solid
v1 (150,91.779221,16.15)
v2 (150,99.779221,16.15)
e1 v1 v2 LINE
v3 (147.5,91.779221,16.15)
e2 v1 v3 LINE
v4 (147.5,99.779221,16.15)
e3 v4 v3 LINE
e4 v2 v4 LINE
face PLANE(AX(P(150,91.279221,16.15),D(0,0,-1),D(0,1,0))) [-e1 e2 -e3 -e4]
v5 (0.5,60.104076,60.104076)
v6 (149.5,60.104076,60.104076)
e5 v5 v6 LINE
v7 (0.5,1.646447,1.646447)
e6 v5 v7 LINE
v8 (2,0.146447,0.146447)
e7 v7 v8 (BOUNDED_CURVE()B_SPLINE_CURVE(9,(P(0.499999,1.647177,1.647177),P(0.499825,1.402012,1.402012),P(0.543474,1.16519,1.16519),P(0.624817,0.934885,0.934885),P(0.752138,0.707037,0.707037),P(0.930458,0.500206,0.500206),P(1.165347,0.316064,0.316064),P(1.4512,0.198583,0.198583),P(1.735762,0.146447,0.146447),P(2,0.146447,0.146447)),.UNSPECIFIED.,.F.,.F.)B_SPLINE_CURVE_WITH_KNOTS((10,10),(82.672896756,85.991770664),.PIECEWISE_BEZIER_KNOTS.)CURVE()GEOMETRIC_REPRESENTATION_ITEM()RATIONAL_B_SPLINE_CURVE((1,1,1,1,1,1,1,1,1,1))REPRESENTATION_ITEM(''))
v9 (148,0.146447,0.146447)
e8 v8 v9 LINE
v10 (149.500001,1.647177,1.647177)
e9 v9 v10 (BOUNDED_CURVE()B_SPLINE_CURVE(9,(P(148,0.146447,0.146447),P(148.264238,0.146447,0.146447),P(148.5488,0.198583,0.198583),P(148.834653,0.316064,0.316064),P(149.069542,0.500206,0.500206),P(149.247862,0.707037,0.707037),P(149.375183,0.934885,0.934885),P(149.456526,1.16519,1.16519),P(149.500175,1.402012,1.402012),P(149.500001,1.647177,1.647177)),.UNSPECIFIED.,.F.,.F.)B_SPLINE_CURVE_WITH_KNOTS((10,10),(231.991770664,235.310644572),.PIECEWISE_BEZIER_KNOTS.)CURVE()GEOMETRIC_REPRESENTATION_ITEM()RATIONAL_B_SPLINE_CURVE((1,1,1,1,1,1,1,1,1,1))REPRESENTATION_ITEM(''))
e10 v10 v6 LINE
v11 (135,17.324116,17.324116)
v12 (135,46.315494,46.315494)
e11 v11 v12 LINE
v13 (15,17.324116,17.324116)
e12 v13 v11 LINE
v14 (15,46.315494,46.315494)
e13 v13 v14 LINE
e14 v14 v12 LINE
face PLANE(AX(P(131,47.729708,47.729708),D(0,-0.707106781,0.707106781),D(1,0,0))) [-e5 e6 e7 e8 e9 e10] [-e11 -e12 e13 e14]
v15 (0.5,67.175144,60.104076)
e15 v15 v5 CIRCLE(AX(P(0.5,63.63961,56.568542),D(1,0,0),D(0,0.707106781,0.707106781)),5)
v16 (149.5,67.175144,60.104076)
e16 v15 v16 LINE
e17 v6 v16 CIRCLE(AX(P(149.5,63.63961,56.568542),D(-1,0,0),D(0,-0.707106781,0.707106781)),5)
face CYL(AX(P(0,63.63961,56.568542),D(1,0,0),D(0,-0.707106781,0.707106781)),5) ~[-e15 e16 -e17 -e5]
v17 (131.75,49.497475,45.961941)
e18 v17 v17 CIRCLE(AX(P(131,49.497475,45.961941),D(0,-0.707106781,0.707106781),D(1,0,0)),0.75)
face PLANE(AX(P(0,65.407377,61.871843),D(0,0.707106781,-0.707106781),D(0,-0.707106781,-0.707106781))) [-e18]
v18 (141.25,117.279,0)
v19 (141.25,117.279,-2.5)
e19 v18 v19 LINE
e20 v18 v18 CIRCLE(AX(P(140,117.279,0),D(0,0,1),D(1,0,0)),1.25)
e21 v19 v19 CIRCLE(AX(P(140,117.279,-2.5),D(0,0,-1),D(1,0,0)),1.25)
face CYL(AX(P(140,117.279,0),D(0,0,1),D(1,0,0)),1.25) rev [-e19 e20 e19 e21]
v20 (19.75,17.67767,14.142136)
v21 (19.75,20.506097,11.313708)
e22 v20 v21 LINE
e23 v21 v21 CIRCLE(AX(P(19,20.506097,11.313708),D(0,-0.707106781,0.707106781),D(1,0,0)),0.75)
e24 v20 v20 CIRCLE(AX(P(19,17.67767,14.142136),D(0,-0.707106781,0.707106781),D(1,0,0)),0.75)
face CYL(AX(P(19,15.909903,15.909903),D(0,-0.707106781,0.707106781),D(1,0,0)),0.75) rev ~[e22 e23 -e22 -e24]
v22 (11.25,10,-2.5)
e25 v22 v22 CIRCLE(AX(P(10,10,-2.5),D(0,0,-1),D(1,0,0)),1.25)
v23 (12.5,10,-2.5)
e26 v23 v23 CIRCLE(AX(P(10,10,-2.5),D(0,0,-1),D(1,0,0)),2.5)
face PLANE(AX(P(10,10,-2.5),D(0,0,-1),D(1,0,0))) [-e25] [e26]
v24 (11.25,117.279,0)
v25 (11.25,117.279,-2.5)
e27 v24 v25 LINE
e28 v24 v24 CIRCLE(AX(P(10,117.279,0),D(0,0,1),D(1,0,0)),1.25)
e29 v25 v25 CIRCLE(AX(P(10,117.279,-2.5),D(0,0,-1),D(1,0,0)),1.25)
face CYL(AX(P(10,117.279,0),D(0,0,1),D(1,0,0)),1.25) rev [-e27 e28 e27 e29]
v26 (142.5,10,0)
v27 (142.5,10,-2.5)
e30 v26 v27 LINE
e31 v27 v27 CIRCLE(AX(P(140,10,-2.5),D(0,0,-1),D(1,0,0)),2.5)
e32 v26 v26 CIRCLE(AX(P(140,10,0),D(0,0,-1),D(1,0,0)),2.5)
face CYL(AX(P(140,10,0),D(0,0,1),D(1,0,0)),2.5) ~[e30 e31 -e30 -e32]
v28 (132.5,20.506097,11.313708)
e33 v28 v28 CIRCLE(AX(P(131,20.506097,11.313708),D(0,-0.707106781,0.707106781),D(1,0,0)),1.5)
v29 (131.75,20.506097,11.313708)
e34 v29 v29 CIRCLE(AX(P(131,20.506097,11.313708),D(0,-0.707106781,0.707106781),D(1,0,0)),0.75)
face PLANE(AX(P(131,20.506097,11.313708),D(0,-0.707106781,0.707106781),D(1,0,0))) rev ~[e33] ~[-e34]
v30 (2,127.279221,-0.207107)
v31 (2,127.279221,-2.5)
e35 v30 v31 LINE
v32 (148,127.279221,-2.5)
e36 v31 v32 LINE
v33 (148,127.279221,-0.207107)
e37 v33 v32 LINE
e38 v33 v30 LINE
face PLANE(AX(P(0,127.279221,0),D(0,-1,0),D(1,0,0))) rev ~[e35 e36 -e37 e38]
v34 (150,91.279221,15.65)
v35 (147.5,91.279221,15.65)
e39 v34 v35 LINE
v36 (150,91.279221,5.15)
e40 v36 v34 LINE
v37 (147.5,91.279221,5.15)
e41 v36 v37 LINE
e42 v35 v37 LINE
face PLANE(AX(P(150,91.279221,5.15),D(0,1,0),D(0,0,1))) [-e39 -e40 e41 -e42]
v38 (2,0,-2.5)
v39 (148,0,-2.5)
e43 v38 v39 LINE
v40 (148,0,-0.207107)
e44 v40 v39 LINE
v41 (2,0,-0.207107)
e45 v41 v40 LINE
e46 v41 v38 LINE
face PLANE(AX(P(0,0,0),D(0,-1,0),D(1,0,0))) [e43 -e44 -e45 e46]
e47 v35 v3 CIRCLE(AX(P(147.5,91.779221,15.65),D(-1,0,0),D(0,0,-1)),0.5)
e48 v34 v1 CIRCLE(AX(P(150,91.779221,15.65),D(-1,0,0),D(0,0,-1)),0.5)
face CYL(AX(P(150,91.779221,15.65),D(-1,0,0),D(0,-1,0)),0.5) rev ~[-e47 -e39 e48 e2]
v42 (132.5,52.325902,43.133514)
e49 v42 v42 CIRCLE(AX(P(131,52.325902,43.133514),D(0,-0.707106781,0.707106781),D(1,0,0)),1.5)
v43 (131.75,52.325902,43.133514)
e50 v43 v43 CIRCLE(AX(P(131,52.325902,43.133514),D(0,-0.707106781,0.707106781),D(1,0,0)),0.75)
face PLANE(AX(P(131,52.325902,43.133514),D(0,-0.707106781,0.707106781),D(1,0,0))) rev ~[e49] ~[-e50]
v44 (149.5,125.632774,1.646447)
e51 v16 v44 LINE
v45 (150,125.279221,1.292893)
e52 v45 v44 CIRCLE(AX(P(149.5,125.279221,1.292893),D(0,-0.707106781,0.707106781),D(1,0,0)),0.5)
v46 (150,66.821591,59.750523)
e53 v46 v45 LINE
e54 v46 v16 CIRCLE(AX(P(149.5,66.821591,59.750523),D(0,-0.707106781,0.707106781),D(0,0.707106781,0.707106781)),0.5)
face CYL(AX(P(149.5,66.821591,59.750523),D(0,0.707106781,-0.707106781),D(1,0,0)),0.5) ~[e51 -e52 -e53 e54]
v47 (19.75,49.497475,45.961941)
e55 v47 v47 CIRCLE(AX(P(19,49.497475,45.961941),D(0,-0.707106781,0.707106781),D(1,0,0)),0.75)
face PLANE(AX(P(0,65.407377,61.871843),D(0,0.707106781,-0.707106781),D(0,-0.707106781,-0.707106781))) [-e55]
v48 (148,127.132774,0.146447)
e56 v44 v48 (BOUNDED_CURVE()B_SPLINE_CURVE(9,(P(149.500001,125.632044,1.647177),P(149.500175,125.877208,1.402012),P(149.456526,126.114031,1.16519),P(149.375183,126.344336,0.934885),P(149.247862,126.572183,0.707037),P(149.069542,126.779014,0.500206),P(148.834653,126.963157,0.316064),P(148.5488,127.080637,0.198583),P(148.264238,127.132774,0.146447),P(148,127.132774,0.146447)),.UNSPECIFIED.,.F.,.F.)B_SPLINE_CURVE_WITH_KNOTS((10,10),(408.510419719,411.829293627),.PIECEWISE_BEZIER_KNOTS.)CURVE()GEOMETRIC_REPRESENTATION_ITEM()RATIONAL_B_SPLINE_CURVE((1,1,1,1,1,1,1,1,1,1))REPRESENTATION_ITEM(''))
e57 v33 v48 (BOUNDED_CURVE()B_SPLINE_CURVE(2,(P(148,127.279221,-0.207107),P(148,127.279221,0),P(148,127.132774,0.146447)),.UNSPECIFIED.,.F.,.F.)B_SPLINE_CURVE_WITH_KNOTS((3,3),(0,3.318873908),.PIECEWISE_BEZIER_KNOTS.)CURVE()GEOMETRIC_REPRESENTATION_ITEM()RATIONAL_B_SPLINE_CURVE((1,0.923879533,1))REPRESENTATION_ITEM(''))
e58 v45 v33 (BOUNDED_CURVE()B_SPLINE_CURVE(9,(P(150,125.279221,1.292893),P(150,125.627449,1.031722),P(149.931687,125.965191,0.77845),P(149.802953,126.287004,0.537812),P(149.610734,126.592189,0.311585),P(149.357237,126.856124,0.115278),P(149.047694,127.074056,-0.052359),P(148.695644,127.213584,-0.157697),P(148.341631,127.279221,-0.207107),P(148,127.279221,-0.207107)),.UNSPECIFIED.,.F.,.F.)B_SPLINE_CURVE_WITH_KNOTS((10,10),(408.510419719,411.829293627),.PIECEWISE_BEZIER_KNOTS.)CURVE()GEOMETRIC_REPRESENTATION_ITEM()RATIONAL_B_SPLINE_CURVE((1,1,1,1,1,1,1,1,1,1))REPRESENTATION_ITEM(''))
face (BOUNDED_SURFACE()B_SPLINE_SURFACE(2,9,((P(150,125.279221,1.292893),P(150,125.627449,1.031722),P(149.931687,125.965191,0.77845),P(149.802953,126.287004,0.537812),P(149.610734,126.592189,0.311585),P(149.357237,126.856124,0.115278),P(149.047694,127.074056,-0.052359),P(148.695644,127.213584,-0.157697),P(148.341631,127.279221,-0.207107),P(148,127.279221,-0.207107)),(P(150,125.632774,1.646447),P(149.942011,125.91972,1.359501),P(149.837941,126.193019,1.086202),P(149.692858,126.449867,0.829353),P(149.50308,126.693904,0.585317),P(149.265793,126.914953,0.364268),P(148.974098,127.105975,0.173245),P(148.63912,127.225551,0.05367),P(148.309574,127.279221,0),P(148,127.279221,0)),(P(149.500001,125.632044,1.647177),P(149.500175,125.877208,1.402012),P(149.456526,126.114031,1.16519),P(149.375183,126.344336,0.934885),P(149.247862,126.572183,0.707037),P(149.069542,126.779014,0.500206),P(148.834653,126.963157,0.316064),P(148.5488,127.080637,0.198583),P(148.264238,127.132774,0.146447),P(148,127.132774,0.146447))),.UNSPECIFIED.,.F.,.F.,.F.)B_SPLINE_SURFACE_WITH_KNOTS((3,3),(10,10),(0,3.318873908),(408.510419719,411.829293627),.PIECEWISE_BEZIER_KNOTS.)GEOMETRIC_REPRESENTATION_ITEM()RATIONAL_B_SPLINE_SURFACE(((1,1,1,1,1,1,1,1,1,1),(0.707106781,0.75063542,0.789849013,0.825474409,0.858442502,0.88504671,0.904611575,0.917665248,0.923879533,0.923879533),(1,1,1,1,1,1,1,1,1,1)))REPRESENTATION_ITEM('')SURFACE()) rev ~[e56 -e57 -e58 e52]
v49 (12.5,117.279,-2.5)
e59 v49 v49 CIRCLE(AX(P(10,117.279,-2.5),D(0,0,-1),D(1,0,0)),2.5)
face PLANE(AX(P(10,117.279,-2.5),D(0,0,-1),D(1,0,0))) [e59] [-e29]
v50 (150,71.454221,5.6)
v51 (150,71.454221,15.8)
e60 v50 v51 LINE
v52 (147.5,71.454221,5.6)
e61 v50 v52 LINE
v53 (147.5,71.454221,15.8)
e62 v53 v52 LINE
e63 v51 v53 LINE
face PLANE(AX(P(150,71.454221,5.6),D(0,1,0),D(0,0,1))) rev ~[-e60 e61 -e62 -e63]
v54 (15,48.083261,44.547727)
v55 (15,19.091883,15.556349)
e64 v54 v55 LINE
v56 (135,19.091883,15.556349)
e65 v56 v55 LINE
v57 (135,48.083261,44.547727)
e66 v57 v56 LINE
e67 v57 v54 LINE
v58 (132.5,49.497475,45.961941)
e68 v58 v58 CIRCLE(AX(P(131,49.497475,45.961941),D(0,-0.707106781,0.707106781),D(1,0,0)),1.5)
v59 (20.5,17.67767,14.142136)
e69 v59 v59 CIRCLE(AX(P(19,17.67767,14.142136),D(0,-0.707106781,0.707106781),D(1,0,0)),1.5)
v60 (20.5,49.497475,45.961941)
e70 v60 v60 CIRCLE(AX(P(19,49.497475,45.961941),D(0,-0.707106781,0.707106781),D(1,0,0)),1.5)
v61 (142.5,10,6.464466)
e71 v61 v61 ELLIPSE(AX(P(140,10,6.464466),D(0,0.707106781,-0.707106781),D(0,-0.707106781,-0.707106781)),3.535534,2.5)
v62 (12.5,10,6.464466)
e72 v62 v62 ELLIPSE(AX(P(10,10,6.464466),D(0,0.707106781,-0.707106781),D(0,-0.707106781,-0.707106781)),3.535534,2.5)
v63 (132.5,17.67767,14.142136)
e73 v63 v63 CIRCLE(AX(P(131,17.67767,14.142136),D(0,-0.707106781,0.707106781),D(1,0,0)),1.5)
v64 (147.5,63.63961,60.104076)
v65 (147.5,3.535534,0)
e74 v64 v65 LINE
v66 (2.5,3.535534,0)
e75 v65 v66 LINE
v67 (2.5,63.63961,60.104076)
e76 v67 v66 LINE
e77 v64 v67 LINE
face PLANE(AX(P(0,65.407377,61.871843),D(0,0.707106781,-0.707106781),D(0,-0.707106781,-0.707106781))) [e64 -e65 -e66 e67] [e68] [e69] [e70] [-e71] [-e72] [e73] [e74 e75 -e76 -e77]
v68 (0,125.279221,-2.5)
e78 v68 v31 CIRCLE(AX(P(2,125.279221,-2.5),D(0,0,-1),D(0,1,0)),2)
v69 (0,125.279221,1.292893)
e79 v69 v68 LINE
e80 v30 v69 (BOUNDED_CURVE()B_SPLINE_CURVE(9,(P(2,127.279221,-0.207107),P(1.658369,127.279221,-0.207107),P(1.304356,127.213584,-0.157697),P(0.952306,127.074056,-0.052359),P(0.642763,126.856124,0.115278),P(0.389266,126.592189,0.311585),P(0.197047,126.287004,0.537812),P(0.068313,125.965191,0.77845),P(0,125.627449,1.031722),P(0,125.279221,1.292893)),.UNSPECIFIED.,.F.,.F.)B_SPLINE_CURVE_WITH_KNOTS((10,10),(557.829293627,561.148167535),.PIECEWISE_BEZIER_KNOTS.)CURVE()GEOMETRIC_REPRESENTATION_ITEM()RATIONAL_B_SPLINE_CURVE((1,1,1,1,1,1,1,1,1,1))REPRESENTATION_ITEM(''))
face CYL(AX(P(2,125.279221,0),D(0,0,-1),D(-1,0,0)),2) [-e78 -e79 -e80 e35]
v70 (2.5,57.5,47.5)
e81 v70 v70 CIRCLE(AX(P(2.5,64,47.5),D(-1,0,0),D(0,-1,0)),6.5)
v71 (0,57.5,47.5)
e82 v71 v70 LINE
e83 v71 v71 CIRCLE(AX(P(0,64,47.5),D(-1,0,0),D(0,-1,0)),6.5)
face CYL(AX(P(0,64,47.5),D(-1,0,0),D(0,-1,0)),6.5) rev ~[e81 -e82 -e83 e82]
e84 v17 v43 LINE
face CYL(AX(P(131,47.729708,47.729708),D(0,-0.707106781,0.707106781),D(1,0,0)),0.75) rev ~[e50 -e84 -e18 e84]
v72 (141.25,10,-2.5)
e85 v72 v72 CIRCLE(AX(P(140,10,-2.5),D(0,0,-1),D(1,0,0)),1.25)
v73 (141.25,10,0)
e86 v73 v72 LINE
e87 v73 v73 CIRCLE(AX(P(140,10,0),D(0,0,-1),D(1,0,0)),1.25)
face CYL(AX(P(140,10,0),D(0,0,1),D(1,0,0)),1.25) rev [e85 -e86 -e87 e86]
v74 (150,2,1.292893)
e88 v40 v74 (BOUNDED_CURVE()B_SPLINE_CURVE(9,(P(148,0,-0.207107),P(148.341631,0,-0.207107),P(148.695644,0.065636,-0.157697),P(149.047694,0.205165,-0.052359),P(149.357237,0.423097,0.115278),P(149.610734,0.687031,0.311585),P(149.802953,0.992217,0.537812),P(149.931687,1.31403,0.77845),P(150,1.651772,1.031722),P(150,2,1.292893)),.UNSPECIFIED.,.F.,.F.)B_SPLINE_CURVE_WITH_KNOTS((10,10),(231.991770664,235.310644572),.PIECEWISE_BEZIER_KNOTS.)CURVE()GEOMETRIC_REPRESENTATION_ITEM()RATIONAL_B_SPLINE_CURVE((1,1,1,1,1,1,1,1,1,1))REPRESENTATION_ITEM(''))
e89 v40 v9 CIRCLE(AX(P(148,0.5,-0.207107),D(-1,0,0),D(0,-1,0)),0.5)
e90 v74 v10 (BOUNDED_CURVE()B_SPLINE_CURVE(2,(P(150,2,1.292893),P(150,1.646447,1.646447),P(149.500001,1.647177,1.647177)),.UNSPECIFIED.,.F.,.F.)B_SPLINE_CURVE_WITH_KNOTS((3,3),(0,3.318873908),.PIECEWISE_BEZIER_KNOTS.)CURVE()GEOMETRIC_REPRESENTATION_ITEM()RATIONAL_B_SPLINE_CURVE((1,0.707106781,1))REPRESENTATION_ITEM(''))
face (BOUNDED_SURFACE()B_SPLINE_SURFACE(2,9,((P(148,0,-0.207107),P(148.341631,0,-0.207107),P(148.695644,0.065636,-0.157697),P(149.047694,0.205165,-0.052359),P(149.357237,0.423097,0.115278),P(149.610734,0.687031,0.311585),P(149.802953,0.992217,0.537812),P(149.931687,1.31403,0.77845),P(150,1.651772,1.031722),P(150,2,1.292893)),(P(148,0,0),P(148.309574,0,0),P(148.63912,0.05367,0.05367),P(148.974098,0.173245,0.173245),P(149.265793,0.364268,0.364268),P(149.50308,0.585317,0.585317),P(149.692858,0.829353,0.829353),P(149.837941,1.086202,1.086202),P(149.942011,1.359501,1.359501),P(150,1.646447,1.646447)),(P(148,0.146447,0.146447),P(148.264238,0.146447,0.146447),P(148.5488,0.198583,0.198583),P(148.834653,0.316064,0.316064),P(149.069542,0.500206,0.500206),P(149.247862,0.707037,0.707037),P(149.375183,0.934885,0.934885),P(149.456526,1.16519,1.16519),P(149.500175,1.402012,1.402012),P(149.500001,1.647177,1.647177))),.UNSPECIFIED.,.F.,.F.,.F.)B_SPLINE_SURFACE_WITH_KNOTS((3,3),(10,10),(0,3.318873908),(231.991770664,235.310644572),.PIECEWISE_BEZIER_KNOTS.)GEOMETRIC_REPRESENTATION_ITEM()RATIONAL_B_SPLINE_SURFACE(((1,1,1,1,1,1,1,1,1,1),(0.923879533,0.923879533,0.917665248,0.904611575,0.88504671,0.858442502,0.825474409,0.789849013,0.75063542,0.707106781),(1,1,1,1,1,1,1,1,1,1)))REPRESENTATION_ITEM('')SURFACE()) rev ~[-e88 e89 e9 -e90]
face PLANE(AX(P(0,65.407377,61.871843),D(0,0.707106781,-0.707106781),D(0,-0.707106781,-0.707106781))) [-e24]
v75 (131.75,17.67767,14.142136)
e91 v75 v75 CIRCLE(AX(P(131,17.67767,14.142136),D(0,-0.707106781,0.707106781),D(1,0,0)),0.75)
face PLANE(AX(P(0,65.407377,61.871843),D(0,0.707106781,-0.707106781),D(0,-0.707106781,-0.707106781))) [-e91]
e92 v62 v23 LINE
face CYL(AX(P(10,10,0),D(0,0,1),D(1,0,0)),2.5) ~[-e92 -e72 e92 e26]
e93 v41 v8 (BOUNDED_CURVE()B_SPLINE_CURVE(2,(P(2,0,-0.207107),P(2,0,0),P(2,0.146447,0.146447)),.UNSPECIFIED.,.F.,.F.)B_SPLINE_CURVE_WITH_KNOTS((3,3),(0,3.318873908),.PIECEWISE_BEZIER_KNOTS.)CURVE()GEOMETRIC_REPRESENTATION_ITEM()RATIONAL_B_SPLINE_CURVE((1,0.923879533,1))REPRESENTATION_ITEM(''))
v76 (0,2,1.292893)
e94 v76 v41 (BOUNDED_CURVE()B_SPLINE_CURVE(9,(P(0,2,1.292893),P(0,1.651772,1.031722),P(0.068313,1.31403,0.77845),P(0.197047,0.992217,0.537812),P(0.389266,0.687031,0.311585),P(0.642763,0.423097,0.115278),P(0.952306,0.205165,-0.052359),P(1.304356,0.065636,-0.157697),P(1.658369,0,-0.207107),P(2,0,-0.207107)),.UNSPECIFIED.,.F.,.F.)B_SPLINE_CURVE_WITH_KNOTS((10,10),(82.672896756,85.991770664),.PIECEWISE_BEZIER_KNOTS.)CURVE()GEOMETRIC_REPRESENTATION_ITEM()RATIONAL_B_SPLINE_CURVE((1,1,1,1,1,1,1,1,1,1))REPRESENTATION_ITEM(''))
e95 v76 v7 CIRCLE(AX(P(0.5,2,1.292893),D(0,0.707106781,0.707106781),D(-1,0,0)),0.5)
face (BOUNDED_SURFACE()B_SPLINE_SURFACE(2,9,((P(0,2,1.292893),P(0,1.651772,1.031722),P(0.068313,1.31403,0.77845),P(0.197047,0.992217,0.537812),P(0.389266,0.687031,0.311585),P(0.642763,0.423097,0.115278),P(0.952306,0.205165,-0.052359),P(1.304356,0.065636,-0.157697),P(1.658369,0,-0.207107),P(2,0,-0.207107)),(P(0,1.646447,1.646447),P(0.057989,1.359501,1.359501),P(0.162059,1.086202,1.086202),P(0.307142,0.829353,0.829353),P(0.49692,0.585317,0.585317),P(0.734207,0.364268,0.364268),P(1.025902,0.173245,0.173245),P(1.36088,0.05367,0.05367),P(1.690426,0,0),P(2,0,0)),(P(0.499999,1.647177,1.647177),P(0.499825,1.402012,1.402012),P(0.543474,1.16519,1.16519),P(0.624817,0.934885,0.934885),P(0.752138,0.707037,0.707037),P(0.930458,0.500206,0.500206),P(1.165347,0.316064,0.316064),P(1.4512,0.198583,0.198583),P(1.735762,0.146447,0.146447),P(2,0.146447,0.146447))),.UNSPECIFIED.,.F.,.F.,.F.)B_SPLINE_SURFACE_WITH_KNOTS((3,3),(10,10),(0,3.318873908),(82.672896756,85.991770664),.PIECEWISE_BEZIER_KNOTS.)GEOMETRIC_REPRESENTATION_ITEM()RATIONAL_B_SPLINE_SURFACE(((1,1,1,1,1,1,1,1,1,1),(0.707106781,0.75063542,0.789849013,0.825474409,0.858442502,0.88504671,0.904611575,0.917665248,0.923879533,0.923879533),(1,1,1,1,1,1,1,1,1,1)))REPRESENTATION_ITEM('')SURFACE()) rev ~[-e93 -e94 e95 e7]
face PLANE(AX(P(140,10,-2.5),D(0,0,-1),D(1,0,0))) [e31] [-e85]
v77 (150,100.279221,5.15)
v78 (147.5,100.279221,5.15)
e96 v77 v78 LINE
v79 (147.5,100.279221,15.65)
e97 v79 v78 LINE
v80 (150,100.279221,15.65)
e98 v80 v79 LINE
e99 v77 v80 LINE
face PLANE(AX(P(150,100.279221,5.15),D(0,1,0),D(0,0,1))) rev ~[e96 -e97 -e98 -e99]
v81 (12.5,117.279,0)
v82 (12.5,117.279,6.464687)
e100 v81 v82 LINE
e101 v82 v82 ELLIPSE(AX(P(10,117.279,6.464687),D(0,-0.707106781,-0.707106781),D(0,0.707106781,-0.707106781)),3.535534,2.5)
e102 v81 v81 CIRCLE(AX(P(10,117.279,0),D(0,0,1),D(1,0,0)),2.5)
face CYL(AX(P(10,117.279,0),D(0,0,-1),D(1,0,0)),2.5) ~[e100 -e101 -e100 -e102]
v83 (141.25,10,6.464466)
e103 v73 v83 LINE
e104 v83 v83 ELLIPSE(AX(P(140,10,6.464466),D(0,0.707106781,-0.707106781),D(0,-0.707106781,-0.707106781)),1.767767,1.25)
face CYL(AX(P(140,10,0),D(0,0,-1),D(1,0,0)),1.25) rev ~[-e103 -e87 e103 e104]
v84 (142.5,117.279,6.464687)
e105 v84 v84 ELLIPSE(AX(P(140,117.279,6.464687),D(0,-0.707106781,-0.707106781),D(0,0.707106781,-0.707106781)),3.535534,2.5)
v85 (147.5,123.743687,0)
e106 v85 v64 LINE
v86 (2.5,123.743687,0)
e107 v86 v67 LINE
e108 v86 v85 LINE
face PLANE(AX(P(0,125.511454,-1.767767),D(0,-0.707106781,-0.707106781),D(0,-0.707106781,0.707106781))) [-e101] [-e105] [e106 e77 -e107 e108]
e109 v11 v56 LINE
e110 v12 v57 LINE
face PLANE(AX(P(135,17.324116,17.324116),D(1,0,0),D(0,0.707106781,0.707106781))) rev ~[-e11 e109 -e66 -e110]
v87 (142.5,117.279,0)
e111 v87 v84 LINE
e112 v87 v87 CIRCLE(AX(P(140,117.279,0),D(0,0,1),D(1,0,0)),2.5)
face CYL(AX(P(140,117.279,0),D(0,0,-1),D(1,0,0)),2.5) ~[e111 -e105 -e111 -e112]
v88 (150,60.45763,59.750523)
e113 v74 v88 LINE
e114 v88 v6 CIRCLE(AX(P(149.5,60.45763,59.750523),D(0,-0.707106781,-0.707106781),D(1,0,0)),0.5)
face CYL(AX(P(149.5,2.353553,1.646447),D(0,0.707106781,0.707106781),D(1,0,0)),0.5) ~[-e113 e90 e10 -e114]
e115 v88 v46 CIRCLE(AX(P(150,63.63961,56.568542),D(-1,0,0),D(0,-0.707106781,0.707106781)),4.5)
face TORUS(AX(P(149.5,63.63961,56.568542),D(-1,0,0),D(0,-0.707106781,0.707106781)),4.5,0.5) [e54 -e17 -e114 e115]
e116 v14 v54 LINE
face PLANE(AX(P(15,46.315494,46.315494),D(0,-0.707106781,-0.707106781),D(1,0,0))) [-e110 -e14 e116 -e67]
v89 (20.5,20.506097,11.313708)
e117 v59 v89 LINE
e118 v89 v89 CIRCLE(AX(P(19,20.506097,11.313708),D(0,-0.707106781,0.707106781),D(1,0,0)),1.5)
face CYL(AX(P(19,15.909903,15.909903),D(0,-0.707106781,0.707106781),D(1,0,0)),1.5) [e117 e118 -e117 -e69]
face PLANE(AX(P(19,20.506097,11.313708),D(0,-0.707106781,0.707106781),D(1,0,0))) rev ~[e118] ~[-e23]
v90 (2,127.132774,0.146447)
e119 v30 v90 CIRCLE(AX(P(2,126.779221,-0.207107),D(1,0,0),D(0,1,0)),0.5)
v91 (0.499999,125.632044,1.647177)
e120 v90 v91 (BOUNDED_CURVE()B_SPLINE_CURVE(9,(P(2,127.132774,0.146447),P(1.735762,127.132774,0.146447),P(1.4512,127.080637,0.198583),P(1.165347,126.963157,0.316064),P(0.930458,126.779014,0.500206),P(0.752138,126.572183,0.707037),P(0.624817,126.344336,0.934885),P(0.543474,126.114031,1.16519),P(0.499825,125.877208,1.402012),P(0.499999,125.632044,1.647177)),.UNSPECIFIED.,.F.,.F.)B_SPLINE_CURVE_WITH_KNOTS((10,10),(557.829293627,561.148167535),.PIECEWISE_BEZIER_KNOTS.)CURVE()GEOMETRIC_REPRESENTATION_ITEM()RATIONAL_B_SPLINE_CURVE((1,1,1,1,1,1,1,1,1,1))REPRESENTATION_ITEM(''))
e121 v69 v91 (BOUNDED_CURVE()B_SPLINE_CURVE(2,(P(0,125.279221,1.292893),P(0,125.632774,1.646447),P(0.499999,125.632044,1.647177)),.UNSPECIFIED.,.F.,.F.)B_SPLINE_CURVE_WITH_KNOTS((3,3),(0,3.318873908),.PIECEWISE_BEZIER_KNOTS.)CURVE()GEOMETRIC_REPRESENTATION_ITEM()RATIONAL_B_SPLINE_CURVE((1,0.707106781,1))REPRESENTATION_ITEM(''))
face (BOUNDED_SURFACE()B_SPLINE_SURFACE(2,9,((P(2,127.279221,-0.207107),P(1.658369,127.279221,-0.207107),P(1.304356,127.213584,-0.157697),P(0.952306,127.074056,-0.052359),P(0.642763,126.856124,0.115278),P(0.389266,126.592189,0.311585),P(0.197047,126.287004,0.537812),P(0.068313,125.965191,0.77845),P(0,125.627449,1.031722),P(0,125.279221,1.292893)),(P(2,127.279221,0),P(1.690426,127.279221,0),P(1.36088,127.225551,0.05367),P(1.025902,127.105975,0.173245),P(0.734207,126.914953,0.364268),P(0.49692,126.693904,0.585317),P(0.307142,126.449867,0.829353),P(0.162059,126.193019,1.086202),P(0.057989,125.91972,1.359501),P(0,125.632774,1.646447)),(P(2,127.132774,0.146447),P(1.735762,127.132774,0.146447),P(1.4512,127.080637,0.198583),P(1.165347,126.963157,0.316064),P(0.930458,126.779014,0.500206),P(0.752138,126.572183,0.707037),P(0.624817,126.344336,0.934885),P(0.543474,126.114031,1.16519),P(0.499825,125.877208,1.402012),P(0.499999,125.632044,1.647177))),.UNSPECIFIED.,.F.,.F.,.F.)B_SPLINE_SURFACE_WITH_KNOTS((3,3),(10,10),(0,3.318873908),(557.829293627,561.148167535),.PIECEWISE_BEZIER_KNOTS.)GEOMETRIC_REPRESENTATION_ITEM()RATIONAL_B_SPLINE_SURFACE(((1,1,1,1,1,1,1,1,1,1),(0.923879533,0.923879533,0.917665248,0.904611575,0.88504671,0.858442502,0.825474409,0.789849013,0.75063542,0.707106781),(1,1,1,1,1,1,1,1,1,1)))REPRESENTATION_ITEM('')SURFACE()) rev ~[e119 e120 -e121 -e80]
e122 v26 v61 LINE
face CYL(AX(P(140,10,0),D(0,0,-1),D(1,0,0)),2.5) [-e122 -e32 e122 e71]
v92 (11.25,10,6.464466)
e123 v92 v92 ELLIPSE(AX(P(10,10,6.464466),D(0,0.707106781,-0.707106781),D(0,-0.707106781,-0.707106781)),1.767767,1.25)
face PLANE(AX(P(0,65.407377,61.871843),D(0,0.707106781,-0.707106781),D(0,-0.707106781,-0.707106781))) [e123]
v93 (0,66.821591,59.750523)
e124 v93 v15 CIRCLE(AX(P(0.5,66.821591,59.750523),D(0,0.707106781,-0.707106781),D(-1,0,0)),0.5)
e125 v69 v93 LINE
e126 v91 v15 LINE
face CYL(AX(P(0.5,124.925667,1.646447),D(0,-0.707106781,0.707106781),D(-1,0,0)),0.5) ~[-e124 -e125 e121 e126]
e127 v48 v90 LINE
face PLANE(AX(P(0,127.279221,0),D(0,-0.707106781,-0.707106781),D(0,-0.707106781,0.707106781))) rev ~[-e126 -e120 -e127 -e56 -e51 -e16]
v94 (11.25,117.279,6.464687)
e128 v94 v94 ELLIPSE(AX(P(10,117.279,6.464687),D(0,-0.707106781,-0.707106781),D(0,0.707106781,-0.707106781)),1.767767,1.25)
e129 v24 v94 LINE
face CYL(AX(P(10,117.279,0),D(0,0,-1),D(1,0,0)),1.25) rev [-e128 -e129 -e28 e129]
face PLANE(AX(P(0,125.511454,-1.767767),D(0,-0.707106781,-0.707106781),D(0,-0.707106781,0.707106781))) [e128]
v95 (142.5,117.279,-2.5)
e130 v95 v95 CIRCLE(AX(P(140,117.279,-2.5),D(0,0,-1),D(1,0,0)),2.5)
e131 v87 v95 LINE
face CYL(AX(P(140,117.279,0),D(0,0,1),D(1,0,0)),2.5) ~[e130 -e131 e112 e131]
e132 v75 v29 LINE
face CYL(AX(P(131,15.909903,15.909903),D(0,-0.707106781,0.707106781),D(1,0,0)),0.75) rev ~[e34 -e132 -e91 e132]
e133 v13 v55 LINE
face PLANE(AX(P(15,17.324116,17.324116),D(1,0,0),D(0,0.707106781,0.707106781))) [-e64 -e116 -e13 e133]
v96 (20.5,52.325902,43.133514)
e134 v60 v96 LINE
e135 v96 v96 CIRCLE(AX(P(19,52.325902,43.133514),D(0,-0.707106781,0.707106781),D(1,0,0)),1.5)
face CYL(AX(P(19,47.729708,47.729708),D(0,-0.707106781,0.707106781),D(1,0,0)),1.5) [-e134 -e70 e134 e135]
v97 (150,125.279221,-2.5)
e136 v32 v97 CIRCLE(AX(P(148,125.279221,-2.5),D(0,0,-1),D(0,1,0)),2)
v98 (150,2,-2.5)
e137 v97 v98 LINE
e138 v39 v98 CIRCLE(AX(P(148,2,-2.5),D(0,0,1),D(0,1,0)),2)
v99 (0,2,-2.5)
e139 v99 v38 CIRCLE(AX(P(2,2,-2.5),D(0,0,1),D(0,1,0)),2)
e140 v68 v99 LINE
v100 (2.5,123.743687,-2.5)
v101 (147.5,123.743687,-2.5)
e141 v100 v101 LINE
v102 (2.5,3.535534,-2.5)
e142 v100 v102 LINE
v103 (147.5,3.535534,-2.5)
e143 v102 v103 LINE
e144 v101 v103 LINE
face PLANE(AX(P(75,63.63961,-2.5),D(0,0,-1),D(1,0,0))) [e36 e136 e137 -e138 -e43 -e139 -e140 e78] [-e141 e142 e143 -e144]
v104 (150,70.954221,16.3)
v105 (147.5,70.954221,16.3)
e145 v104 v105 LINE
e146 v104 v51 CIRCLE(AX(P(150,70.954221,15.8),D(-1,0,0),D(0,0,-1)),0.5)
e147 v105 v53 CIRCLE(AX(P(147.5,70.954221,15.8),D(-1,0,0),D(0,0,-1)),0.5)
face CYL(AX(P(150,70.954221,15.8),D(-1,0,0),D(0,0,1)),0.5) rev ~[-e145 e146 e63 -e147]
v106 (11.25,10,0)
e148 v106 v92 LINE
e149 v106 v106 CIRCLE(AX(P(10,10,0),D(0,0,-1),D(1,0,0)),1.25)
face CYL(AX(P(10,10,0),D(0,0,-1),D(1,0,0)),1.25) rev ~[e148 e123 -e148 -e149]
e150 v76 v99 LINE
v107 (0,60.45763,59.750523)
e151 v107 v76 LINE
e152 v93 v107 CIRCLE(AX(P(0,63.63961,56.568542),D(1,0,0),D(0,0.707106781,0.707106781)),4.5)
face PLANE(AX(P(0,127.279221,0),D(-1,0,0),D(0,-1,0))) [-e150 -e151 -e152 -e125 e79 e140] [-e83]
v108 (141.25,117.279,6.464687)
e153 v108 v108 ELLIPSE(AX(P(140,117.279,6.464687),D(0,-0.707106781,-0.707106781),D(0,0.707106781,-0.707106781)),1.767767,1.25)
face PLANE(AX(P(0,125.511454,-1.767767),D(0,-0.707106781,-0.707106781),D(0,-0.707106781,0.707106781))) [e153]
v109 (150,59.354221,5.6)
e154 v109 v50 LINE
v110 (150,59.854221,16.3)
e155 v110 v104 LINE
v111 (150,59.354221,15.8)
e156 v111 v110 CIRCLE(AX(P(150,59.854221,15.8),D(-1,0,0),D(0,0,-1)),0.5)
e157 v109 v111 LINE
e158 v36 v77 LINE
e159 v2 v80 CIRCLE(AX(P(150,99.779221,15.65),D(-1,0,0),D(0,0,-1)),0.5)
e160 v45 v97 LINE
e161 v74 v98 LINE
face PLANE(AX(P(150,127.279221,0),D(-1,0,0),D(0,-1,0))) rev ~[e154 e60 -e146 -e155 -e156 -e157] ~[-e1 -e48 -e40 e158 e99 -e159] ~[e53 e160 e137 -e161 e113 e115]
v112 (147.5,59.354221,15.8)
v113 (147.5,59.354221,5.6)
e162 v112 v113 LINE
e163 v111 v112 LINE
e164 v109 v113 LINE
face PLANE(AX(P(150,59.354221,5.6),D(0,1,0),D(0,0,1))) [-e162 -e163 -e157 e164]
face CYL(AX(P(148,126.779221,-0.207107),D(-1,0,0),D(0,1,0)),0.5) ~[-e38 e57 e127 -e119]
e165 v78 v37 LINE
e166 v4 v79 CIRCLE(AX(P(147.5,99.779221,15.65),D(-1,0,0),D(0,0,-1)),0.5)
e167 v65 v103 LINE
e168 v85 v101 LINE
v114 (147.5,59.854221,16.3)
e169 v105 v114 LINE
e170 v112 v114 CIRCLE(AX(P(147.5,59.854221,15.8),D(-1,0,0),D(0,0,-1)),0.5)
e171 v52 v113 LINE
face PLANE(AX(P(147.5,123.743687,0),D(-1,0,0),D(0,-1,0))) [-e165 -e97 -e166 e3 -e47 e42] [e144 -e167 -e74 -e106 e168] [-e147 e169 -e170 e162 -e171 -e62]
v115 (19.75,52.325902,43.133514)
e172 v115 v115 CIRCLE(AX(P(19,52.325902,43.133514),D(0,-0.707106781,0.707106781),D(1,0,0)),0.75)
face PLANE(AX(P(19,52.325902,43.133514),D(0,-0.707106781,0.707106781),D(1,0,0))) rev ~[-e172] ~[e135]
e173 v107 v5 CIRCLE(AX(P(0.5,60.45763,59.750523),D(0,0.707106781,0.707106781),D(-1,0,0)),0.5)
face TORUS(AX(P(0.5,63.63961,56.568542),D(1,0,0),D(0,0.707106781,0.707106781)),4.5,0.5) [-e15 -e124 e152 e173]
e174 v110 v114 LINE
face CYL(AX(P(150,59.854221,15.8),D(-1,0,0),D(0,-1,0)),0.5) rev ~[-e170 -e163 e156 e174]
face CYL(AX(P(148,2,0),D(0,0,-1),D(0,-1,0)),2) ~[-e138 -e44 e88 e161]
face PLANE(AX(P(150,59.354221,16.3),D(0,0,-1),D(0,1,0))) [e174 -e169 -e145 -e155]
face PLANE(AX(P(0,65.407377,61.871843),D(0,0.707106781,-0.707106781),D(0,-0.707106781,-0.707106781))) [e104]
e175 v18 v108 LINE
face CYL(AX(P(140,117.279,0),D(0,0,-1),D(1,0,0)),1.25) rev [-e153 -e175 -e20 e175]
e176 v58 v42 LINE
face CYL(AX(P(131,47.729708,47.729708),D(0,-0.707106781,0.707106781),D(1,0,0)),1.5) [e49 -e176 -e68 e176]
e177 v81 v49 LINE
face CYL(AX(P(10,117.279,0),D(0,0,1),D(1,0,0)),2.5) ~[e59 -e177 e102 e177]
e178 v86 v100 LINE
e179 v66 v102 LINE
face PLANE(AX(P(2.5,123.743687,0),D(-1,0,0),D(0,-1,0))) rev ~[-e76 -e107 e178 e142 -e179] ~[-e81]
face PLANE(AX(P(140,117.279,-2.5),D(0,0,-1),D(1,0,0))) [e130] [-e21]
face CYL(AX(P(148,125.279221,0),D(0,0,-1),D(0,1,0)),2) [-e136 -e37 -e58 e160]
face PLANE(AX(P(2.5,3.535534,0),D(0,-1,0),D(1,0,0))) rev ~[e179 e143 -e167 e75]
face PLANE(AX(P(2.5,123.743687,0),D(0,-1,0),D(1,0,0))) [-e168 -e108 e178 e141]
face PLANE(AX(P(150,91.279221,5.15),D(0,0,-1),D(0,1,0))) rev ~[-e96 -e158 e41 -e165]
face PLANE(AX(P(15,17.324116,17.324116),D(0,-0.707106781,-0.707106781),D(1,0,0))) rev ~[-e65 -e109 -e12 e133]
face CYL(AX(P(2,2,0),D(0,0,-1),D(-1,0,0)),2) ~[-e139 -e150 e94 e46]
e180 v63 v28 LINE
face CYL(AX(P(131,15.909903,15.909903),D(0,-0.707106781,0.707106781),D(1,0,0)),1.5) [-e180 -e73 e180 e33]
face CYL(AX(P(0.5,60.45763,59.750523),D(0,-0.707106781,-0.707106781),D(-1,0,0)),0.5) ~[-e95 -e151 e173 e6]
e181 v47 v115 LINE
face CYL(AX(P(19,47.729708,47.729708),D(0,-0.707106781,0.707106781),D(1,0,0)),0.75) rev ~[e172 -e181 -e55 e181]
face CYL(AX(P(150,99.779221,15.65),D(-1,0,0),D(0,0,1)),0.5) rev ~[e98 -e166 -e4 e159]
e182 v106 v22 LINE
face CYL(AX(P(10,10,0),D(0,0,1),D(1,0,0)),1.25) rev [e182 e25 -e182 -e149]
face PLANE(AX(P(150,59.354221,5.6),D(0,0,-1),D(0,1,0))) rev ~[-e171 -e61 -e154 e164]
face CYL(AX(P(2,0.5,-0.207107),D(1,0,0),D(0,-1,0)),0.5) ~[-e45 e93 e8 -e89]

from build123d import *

# Parameters (mm, degrees)
F1_DEPTH  = 150
F2_T      = -2.5
F4_W      = 120
F4_H      = 41
F5_DEPTH  = 3
F6_R      = 5
F8_R      = 1.5
F8_R_2    = 0.75
F9_DEPTH  = 6.5
F10_R     = 2.5
F10_R_2   = 1.5
F12_R     = 2.5
F12_R_2   = 1.25
F13_REACH = 68.6406103068
F14_W     = 150
F14_H     = 127.2792206136
F14_W_2   = 145
F14_H_2   = 120.2081528017
F15_DEPTH = 2.5
F16_R     = 2.5
F16_R_2   = 1.25
F18_R     = 2
F19_R     = 0.5
F7_W      = 9
F7_H      = 11
F7_W_2    = 12.1
F7_H_2    = 10.7
F20_DEPTH = 3
F21_R     = 0.5
F22_R     = 0.5
F23_R     = 6.5
F24_DEPTH = 2.5
F25_R     = 2.5
F25_R_2   = 1.25
F26_DEPTH = 2.5


with BuildPart() as f1:
    # F0 (on Right) → F1 (new body)
    with BuildSketch(Plane.YZ):
        Polygon((63.6396103068, 63.6396103068), (0, 0), (127.2792206136, 0), align=None)
    extrude(amount=F1_DEPTH)

    # F2
    f2_openings = [f1.faces().sort_by_distance(p)[0] for p in [
        (75, 63.63961, 0),
    ]]
    offset(amount=F2_T, openings=f2_openings, kind=Kind.INTERSECTION)

    # F4 (on offset) → F5 (cut)
    with BuildSketch(Plane(origin=(0, 0, 0), x_dir=(1, 0, 0), z_dir=(0, -0.7071067812, 0.7071067812))):
        with Locations((75, 45)):
            Rectangle(F4_W, F4_H)
    extrude(amount=-F5_DEPTH, mode=Mode.SUBTRACT)

    # F6
    f6_edges = [f1.edges().sort_by_distance(p)[0] for p in [
        (75, 63.63961, 63.63961),
    ]]
    fillet(f6_edges, radius=F6_R)

    # F8 (on face) → F9 (join)
    with BuildSketch(Plane(origin=(0, 0, 0), x_dir=(1, 0, 0), z_dir=(0, -0.7071067812, 0.7071067812))):
        with Locations((131, 67.5)):
            Circle(F8_R)
        with Locations((131, 67.5)):
            Circle(F8_R_2, mode=Mode.SUBTRACT)
        with Locations((131, 22.5)):
            Circle(F8_R)
        with Locations((131, 22.5)):
            Circle(F8_R_2, mode=Mode.SUBTRACT)
        with Locations((19, 67.5)):
            Circle(F8_R)
        with Locations((19, 67.5)):
            Circle(F8_R_2, mode=Mode.SUBTRACT)
        with Locations((19, 22.5)):
            Circle(F8_R)
        with Locations((19, 22.5)):
            Circle(F8_R_2, mode=Mode.SUBTRACT)
    extrude(amount=-F9_DEPTH)

    # F10 (on face) → F11 (join, up to the last surface of F1)
    with BuildSketch(Plane(origin=(0, 0, 0), x_dir=(1, 0, 0), z_dir=(0, 0, -1))):
        with Locations((10, -10)):
            Circle(F10_R)
        with Locations((10, -10)):
            Circle(F10_R_2, mode=Mode.SUBTRACT)
    extrude(until=Until.LAST, dir=(0, 0, 1))

    f13_end = Plane(origin=(75.2456023398, 33.6766976894, 30.1411637835), x_dir=(0, 0.7071067812, 0.7071067812), z_dir=(0, 0.7071067812, -0.7071067812))
    # F12 (on face) → F13 (join, up to a plane its end follows)
    with BuildSketch(Plane(origin=(0, 0, 0), x_dir=(1, 0, 0), z_dir=(0, 0, -1))):
        with Locations((10, -10)):
            Circle(F12_R)
        with Locations((10, -10)):
            Circle(F12_R_2, mode=Mode.SUBTRACT)
        with Locations((140, -10)):
            Circle(F12_R)
        with Locations((140, -10)):
            Circle(F12_R_2, mode=Mode.SUBTRACT)
    f13_long = extrude(amount=-F13_REACH, mode=Mode.PRIVATE)
    add(split(f13_long, bisect_by=f13_end, keep=Keep.TOP, mode=Mode.PRIVATE))

    # F14 (on face) → F15 (join)
    with BuildSketch(Plane(origin=(0, 0, 0), x_dir=(1, 0, 0), z_dir=(0, 0, -1))):
        with Locations((75, -63.6396103068)):
            Rectangle(F14_W, F14_H)
        with Locations((75, -63.6396103068)):
            Rectangle(F14_W_2, F14_H_2, mode=Mode.SUBTRACT)
    extrude(amount=F15_DEPTH)

    # F16 (on Top) → F17 (join, up to the next surface of F1)
    with BuildSketch(Plane.XY):
        with Locations((140, 117.279)):
            Circle(F16_R)
        with Locations((140, 117.279)):
            Circle(F16_R_2, mode=Mode.SUBTRACT)
        with Locations((10, 117.279)):
            Circle(F16_R)
        with Locations((10, 117.279)):
            Circle(F16_R_2, mode=Mode.SUBTRACT)
    extrude(until=Until.NEXT)

    # F18
    f18_edges = [f1.edges().sort_by_distance(p)[0] for p in [
        (150, 127.279221, -1.25),
        (150, 0, -1.25),
        (0, 0, -1.25),
        (0, 127.279221, -1.25),
    ]]
    fillet(f18_edges, radius=F18_R)

    # F19
    f19_edges = [f1.edges().sort_by_distance(p)[0] for p in [
        (0, 31.052038, 31.052038),
    ]]
    fillet(f19_edges, radius=F19_R)

    # F7 (on face) → F20 (cut)
    with BuildSketch(Plane.YZ.offset(150)):
        with Locations((95.7792206136, 10.65)):
            Rectangle(F7_W, F7_H)
        with Locations((65.4042206136, 10.95)):
            Rectangle(F7_W_2, F7_H_2)
    extrude(amount=-F20_DEPTH, mode=Mode.SUBTRACT)

    # F21
    f21_edges = [f1.edges().sort_by_distance(p)[0] for p in [
        (148.75, 91.279221, 16.15),
        (148.75, 100.279221, 16.15),
    ]]
    fillet(f21_edges, radius=F21_R)

    # F22
    f22_edges = [f1.edges().sort_by_distance(p)[0] for p in [
        (148.75, 59.354221, 16.3),
        (148.75, 71.454221, 16.3),
    ]]
    fillet(f22_edges, radius=F22_R)

    # F23 (on face) → F24 (cut)
    with BuildSketch(Plane(origin=(0, 0, 0), x_dir=(0, -1, 0), z_dir=(-1, 0, 0))):
        with Locations((-64, 47.5)):
            Circle(F23_R)
    extrude(amount=-F24_DEPTH, mode=Mode.SUBTRACT)

    # F25 (on face) → F26 (join)
    with BuildSketch(Plane(origin=(0, 0, 0), x_dir=(1, 0, 0), z_dir=(0, 0, -1))):
        with Locations((10, -10)):
            Circle(F25_R)
        with Locations((10, -10)):
            Circle(F25_R_2, mode=Mode.SUBTRACT)
        with Locations((140, -10)):
            Circle(F25_R)
        with Locations((140, -10)):
            Circle(F25_R_2, mode=Mode.SUBTRACT)
        with Locations((10, -117.279)):
            Circle(F25_R)
        with Locations((10, -117.279)):
            Circle(F25_R_2, mode=Mode.SUBTRACT)
        with Locations((140, -117.279)):
            Circle(F25_R)
        with Locations((140, -117.279)):
            Circle(F25_R_2, mode=Mode.SUBTRACT)
    extrude(amount=F26_DEPTH)


solid = f1.part
